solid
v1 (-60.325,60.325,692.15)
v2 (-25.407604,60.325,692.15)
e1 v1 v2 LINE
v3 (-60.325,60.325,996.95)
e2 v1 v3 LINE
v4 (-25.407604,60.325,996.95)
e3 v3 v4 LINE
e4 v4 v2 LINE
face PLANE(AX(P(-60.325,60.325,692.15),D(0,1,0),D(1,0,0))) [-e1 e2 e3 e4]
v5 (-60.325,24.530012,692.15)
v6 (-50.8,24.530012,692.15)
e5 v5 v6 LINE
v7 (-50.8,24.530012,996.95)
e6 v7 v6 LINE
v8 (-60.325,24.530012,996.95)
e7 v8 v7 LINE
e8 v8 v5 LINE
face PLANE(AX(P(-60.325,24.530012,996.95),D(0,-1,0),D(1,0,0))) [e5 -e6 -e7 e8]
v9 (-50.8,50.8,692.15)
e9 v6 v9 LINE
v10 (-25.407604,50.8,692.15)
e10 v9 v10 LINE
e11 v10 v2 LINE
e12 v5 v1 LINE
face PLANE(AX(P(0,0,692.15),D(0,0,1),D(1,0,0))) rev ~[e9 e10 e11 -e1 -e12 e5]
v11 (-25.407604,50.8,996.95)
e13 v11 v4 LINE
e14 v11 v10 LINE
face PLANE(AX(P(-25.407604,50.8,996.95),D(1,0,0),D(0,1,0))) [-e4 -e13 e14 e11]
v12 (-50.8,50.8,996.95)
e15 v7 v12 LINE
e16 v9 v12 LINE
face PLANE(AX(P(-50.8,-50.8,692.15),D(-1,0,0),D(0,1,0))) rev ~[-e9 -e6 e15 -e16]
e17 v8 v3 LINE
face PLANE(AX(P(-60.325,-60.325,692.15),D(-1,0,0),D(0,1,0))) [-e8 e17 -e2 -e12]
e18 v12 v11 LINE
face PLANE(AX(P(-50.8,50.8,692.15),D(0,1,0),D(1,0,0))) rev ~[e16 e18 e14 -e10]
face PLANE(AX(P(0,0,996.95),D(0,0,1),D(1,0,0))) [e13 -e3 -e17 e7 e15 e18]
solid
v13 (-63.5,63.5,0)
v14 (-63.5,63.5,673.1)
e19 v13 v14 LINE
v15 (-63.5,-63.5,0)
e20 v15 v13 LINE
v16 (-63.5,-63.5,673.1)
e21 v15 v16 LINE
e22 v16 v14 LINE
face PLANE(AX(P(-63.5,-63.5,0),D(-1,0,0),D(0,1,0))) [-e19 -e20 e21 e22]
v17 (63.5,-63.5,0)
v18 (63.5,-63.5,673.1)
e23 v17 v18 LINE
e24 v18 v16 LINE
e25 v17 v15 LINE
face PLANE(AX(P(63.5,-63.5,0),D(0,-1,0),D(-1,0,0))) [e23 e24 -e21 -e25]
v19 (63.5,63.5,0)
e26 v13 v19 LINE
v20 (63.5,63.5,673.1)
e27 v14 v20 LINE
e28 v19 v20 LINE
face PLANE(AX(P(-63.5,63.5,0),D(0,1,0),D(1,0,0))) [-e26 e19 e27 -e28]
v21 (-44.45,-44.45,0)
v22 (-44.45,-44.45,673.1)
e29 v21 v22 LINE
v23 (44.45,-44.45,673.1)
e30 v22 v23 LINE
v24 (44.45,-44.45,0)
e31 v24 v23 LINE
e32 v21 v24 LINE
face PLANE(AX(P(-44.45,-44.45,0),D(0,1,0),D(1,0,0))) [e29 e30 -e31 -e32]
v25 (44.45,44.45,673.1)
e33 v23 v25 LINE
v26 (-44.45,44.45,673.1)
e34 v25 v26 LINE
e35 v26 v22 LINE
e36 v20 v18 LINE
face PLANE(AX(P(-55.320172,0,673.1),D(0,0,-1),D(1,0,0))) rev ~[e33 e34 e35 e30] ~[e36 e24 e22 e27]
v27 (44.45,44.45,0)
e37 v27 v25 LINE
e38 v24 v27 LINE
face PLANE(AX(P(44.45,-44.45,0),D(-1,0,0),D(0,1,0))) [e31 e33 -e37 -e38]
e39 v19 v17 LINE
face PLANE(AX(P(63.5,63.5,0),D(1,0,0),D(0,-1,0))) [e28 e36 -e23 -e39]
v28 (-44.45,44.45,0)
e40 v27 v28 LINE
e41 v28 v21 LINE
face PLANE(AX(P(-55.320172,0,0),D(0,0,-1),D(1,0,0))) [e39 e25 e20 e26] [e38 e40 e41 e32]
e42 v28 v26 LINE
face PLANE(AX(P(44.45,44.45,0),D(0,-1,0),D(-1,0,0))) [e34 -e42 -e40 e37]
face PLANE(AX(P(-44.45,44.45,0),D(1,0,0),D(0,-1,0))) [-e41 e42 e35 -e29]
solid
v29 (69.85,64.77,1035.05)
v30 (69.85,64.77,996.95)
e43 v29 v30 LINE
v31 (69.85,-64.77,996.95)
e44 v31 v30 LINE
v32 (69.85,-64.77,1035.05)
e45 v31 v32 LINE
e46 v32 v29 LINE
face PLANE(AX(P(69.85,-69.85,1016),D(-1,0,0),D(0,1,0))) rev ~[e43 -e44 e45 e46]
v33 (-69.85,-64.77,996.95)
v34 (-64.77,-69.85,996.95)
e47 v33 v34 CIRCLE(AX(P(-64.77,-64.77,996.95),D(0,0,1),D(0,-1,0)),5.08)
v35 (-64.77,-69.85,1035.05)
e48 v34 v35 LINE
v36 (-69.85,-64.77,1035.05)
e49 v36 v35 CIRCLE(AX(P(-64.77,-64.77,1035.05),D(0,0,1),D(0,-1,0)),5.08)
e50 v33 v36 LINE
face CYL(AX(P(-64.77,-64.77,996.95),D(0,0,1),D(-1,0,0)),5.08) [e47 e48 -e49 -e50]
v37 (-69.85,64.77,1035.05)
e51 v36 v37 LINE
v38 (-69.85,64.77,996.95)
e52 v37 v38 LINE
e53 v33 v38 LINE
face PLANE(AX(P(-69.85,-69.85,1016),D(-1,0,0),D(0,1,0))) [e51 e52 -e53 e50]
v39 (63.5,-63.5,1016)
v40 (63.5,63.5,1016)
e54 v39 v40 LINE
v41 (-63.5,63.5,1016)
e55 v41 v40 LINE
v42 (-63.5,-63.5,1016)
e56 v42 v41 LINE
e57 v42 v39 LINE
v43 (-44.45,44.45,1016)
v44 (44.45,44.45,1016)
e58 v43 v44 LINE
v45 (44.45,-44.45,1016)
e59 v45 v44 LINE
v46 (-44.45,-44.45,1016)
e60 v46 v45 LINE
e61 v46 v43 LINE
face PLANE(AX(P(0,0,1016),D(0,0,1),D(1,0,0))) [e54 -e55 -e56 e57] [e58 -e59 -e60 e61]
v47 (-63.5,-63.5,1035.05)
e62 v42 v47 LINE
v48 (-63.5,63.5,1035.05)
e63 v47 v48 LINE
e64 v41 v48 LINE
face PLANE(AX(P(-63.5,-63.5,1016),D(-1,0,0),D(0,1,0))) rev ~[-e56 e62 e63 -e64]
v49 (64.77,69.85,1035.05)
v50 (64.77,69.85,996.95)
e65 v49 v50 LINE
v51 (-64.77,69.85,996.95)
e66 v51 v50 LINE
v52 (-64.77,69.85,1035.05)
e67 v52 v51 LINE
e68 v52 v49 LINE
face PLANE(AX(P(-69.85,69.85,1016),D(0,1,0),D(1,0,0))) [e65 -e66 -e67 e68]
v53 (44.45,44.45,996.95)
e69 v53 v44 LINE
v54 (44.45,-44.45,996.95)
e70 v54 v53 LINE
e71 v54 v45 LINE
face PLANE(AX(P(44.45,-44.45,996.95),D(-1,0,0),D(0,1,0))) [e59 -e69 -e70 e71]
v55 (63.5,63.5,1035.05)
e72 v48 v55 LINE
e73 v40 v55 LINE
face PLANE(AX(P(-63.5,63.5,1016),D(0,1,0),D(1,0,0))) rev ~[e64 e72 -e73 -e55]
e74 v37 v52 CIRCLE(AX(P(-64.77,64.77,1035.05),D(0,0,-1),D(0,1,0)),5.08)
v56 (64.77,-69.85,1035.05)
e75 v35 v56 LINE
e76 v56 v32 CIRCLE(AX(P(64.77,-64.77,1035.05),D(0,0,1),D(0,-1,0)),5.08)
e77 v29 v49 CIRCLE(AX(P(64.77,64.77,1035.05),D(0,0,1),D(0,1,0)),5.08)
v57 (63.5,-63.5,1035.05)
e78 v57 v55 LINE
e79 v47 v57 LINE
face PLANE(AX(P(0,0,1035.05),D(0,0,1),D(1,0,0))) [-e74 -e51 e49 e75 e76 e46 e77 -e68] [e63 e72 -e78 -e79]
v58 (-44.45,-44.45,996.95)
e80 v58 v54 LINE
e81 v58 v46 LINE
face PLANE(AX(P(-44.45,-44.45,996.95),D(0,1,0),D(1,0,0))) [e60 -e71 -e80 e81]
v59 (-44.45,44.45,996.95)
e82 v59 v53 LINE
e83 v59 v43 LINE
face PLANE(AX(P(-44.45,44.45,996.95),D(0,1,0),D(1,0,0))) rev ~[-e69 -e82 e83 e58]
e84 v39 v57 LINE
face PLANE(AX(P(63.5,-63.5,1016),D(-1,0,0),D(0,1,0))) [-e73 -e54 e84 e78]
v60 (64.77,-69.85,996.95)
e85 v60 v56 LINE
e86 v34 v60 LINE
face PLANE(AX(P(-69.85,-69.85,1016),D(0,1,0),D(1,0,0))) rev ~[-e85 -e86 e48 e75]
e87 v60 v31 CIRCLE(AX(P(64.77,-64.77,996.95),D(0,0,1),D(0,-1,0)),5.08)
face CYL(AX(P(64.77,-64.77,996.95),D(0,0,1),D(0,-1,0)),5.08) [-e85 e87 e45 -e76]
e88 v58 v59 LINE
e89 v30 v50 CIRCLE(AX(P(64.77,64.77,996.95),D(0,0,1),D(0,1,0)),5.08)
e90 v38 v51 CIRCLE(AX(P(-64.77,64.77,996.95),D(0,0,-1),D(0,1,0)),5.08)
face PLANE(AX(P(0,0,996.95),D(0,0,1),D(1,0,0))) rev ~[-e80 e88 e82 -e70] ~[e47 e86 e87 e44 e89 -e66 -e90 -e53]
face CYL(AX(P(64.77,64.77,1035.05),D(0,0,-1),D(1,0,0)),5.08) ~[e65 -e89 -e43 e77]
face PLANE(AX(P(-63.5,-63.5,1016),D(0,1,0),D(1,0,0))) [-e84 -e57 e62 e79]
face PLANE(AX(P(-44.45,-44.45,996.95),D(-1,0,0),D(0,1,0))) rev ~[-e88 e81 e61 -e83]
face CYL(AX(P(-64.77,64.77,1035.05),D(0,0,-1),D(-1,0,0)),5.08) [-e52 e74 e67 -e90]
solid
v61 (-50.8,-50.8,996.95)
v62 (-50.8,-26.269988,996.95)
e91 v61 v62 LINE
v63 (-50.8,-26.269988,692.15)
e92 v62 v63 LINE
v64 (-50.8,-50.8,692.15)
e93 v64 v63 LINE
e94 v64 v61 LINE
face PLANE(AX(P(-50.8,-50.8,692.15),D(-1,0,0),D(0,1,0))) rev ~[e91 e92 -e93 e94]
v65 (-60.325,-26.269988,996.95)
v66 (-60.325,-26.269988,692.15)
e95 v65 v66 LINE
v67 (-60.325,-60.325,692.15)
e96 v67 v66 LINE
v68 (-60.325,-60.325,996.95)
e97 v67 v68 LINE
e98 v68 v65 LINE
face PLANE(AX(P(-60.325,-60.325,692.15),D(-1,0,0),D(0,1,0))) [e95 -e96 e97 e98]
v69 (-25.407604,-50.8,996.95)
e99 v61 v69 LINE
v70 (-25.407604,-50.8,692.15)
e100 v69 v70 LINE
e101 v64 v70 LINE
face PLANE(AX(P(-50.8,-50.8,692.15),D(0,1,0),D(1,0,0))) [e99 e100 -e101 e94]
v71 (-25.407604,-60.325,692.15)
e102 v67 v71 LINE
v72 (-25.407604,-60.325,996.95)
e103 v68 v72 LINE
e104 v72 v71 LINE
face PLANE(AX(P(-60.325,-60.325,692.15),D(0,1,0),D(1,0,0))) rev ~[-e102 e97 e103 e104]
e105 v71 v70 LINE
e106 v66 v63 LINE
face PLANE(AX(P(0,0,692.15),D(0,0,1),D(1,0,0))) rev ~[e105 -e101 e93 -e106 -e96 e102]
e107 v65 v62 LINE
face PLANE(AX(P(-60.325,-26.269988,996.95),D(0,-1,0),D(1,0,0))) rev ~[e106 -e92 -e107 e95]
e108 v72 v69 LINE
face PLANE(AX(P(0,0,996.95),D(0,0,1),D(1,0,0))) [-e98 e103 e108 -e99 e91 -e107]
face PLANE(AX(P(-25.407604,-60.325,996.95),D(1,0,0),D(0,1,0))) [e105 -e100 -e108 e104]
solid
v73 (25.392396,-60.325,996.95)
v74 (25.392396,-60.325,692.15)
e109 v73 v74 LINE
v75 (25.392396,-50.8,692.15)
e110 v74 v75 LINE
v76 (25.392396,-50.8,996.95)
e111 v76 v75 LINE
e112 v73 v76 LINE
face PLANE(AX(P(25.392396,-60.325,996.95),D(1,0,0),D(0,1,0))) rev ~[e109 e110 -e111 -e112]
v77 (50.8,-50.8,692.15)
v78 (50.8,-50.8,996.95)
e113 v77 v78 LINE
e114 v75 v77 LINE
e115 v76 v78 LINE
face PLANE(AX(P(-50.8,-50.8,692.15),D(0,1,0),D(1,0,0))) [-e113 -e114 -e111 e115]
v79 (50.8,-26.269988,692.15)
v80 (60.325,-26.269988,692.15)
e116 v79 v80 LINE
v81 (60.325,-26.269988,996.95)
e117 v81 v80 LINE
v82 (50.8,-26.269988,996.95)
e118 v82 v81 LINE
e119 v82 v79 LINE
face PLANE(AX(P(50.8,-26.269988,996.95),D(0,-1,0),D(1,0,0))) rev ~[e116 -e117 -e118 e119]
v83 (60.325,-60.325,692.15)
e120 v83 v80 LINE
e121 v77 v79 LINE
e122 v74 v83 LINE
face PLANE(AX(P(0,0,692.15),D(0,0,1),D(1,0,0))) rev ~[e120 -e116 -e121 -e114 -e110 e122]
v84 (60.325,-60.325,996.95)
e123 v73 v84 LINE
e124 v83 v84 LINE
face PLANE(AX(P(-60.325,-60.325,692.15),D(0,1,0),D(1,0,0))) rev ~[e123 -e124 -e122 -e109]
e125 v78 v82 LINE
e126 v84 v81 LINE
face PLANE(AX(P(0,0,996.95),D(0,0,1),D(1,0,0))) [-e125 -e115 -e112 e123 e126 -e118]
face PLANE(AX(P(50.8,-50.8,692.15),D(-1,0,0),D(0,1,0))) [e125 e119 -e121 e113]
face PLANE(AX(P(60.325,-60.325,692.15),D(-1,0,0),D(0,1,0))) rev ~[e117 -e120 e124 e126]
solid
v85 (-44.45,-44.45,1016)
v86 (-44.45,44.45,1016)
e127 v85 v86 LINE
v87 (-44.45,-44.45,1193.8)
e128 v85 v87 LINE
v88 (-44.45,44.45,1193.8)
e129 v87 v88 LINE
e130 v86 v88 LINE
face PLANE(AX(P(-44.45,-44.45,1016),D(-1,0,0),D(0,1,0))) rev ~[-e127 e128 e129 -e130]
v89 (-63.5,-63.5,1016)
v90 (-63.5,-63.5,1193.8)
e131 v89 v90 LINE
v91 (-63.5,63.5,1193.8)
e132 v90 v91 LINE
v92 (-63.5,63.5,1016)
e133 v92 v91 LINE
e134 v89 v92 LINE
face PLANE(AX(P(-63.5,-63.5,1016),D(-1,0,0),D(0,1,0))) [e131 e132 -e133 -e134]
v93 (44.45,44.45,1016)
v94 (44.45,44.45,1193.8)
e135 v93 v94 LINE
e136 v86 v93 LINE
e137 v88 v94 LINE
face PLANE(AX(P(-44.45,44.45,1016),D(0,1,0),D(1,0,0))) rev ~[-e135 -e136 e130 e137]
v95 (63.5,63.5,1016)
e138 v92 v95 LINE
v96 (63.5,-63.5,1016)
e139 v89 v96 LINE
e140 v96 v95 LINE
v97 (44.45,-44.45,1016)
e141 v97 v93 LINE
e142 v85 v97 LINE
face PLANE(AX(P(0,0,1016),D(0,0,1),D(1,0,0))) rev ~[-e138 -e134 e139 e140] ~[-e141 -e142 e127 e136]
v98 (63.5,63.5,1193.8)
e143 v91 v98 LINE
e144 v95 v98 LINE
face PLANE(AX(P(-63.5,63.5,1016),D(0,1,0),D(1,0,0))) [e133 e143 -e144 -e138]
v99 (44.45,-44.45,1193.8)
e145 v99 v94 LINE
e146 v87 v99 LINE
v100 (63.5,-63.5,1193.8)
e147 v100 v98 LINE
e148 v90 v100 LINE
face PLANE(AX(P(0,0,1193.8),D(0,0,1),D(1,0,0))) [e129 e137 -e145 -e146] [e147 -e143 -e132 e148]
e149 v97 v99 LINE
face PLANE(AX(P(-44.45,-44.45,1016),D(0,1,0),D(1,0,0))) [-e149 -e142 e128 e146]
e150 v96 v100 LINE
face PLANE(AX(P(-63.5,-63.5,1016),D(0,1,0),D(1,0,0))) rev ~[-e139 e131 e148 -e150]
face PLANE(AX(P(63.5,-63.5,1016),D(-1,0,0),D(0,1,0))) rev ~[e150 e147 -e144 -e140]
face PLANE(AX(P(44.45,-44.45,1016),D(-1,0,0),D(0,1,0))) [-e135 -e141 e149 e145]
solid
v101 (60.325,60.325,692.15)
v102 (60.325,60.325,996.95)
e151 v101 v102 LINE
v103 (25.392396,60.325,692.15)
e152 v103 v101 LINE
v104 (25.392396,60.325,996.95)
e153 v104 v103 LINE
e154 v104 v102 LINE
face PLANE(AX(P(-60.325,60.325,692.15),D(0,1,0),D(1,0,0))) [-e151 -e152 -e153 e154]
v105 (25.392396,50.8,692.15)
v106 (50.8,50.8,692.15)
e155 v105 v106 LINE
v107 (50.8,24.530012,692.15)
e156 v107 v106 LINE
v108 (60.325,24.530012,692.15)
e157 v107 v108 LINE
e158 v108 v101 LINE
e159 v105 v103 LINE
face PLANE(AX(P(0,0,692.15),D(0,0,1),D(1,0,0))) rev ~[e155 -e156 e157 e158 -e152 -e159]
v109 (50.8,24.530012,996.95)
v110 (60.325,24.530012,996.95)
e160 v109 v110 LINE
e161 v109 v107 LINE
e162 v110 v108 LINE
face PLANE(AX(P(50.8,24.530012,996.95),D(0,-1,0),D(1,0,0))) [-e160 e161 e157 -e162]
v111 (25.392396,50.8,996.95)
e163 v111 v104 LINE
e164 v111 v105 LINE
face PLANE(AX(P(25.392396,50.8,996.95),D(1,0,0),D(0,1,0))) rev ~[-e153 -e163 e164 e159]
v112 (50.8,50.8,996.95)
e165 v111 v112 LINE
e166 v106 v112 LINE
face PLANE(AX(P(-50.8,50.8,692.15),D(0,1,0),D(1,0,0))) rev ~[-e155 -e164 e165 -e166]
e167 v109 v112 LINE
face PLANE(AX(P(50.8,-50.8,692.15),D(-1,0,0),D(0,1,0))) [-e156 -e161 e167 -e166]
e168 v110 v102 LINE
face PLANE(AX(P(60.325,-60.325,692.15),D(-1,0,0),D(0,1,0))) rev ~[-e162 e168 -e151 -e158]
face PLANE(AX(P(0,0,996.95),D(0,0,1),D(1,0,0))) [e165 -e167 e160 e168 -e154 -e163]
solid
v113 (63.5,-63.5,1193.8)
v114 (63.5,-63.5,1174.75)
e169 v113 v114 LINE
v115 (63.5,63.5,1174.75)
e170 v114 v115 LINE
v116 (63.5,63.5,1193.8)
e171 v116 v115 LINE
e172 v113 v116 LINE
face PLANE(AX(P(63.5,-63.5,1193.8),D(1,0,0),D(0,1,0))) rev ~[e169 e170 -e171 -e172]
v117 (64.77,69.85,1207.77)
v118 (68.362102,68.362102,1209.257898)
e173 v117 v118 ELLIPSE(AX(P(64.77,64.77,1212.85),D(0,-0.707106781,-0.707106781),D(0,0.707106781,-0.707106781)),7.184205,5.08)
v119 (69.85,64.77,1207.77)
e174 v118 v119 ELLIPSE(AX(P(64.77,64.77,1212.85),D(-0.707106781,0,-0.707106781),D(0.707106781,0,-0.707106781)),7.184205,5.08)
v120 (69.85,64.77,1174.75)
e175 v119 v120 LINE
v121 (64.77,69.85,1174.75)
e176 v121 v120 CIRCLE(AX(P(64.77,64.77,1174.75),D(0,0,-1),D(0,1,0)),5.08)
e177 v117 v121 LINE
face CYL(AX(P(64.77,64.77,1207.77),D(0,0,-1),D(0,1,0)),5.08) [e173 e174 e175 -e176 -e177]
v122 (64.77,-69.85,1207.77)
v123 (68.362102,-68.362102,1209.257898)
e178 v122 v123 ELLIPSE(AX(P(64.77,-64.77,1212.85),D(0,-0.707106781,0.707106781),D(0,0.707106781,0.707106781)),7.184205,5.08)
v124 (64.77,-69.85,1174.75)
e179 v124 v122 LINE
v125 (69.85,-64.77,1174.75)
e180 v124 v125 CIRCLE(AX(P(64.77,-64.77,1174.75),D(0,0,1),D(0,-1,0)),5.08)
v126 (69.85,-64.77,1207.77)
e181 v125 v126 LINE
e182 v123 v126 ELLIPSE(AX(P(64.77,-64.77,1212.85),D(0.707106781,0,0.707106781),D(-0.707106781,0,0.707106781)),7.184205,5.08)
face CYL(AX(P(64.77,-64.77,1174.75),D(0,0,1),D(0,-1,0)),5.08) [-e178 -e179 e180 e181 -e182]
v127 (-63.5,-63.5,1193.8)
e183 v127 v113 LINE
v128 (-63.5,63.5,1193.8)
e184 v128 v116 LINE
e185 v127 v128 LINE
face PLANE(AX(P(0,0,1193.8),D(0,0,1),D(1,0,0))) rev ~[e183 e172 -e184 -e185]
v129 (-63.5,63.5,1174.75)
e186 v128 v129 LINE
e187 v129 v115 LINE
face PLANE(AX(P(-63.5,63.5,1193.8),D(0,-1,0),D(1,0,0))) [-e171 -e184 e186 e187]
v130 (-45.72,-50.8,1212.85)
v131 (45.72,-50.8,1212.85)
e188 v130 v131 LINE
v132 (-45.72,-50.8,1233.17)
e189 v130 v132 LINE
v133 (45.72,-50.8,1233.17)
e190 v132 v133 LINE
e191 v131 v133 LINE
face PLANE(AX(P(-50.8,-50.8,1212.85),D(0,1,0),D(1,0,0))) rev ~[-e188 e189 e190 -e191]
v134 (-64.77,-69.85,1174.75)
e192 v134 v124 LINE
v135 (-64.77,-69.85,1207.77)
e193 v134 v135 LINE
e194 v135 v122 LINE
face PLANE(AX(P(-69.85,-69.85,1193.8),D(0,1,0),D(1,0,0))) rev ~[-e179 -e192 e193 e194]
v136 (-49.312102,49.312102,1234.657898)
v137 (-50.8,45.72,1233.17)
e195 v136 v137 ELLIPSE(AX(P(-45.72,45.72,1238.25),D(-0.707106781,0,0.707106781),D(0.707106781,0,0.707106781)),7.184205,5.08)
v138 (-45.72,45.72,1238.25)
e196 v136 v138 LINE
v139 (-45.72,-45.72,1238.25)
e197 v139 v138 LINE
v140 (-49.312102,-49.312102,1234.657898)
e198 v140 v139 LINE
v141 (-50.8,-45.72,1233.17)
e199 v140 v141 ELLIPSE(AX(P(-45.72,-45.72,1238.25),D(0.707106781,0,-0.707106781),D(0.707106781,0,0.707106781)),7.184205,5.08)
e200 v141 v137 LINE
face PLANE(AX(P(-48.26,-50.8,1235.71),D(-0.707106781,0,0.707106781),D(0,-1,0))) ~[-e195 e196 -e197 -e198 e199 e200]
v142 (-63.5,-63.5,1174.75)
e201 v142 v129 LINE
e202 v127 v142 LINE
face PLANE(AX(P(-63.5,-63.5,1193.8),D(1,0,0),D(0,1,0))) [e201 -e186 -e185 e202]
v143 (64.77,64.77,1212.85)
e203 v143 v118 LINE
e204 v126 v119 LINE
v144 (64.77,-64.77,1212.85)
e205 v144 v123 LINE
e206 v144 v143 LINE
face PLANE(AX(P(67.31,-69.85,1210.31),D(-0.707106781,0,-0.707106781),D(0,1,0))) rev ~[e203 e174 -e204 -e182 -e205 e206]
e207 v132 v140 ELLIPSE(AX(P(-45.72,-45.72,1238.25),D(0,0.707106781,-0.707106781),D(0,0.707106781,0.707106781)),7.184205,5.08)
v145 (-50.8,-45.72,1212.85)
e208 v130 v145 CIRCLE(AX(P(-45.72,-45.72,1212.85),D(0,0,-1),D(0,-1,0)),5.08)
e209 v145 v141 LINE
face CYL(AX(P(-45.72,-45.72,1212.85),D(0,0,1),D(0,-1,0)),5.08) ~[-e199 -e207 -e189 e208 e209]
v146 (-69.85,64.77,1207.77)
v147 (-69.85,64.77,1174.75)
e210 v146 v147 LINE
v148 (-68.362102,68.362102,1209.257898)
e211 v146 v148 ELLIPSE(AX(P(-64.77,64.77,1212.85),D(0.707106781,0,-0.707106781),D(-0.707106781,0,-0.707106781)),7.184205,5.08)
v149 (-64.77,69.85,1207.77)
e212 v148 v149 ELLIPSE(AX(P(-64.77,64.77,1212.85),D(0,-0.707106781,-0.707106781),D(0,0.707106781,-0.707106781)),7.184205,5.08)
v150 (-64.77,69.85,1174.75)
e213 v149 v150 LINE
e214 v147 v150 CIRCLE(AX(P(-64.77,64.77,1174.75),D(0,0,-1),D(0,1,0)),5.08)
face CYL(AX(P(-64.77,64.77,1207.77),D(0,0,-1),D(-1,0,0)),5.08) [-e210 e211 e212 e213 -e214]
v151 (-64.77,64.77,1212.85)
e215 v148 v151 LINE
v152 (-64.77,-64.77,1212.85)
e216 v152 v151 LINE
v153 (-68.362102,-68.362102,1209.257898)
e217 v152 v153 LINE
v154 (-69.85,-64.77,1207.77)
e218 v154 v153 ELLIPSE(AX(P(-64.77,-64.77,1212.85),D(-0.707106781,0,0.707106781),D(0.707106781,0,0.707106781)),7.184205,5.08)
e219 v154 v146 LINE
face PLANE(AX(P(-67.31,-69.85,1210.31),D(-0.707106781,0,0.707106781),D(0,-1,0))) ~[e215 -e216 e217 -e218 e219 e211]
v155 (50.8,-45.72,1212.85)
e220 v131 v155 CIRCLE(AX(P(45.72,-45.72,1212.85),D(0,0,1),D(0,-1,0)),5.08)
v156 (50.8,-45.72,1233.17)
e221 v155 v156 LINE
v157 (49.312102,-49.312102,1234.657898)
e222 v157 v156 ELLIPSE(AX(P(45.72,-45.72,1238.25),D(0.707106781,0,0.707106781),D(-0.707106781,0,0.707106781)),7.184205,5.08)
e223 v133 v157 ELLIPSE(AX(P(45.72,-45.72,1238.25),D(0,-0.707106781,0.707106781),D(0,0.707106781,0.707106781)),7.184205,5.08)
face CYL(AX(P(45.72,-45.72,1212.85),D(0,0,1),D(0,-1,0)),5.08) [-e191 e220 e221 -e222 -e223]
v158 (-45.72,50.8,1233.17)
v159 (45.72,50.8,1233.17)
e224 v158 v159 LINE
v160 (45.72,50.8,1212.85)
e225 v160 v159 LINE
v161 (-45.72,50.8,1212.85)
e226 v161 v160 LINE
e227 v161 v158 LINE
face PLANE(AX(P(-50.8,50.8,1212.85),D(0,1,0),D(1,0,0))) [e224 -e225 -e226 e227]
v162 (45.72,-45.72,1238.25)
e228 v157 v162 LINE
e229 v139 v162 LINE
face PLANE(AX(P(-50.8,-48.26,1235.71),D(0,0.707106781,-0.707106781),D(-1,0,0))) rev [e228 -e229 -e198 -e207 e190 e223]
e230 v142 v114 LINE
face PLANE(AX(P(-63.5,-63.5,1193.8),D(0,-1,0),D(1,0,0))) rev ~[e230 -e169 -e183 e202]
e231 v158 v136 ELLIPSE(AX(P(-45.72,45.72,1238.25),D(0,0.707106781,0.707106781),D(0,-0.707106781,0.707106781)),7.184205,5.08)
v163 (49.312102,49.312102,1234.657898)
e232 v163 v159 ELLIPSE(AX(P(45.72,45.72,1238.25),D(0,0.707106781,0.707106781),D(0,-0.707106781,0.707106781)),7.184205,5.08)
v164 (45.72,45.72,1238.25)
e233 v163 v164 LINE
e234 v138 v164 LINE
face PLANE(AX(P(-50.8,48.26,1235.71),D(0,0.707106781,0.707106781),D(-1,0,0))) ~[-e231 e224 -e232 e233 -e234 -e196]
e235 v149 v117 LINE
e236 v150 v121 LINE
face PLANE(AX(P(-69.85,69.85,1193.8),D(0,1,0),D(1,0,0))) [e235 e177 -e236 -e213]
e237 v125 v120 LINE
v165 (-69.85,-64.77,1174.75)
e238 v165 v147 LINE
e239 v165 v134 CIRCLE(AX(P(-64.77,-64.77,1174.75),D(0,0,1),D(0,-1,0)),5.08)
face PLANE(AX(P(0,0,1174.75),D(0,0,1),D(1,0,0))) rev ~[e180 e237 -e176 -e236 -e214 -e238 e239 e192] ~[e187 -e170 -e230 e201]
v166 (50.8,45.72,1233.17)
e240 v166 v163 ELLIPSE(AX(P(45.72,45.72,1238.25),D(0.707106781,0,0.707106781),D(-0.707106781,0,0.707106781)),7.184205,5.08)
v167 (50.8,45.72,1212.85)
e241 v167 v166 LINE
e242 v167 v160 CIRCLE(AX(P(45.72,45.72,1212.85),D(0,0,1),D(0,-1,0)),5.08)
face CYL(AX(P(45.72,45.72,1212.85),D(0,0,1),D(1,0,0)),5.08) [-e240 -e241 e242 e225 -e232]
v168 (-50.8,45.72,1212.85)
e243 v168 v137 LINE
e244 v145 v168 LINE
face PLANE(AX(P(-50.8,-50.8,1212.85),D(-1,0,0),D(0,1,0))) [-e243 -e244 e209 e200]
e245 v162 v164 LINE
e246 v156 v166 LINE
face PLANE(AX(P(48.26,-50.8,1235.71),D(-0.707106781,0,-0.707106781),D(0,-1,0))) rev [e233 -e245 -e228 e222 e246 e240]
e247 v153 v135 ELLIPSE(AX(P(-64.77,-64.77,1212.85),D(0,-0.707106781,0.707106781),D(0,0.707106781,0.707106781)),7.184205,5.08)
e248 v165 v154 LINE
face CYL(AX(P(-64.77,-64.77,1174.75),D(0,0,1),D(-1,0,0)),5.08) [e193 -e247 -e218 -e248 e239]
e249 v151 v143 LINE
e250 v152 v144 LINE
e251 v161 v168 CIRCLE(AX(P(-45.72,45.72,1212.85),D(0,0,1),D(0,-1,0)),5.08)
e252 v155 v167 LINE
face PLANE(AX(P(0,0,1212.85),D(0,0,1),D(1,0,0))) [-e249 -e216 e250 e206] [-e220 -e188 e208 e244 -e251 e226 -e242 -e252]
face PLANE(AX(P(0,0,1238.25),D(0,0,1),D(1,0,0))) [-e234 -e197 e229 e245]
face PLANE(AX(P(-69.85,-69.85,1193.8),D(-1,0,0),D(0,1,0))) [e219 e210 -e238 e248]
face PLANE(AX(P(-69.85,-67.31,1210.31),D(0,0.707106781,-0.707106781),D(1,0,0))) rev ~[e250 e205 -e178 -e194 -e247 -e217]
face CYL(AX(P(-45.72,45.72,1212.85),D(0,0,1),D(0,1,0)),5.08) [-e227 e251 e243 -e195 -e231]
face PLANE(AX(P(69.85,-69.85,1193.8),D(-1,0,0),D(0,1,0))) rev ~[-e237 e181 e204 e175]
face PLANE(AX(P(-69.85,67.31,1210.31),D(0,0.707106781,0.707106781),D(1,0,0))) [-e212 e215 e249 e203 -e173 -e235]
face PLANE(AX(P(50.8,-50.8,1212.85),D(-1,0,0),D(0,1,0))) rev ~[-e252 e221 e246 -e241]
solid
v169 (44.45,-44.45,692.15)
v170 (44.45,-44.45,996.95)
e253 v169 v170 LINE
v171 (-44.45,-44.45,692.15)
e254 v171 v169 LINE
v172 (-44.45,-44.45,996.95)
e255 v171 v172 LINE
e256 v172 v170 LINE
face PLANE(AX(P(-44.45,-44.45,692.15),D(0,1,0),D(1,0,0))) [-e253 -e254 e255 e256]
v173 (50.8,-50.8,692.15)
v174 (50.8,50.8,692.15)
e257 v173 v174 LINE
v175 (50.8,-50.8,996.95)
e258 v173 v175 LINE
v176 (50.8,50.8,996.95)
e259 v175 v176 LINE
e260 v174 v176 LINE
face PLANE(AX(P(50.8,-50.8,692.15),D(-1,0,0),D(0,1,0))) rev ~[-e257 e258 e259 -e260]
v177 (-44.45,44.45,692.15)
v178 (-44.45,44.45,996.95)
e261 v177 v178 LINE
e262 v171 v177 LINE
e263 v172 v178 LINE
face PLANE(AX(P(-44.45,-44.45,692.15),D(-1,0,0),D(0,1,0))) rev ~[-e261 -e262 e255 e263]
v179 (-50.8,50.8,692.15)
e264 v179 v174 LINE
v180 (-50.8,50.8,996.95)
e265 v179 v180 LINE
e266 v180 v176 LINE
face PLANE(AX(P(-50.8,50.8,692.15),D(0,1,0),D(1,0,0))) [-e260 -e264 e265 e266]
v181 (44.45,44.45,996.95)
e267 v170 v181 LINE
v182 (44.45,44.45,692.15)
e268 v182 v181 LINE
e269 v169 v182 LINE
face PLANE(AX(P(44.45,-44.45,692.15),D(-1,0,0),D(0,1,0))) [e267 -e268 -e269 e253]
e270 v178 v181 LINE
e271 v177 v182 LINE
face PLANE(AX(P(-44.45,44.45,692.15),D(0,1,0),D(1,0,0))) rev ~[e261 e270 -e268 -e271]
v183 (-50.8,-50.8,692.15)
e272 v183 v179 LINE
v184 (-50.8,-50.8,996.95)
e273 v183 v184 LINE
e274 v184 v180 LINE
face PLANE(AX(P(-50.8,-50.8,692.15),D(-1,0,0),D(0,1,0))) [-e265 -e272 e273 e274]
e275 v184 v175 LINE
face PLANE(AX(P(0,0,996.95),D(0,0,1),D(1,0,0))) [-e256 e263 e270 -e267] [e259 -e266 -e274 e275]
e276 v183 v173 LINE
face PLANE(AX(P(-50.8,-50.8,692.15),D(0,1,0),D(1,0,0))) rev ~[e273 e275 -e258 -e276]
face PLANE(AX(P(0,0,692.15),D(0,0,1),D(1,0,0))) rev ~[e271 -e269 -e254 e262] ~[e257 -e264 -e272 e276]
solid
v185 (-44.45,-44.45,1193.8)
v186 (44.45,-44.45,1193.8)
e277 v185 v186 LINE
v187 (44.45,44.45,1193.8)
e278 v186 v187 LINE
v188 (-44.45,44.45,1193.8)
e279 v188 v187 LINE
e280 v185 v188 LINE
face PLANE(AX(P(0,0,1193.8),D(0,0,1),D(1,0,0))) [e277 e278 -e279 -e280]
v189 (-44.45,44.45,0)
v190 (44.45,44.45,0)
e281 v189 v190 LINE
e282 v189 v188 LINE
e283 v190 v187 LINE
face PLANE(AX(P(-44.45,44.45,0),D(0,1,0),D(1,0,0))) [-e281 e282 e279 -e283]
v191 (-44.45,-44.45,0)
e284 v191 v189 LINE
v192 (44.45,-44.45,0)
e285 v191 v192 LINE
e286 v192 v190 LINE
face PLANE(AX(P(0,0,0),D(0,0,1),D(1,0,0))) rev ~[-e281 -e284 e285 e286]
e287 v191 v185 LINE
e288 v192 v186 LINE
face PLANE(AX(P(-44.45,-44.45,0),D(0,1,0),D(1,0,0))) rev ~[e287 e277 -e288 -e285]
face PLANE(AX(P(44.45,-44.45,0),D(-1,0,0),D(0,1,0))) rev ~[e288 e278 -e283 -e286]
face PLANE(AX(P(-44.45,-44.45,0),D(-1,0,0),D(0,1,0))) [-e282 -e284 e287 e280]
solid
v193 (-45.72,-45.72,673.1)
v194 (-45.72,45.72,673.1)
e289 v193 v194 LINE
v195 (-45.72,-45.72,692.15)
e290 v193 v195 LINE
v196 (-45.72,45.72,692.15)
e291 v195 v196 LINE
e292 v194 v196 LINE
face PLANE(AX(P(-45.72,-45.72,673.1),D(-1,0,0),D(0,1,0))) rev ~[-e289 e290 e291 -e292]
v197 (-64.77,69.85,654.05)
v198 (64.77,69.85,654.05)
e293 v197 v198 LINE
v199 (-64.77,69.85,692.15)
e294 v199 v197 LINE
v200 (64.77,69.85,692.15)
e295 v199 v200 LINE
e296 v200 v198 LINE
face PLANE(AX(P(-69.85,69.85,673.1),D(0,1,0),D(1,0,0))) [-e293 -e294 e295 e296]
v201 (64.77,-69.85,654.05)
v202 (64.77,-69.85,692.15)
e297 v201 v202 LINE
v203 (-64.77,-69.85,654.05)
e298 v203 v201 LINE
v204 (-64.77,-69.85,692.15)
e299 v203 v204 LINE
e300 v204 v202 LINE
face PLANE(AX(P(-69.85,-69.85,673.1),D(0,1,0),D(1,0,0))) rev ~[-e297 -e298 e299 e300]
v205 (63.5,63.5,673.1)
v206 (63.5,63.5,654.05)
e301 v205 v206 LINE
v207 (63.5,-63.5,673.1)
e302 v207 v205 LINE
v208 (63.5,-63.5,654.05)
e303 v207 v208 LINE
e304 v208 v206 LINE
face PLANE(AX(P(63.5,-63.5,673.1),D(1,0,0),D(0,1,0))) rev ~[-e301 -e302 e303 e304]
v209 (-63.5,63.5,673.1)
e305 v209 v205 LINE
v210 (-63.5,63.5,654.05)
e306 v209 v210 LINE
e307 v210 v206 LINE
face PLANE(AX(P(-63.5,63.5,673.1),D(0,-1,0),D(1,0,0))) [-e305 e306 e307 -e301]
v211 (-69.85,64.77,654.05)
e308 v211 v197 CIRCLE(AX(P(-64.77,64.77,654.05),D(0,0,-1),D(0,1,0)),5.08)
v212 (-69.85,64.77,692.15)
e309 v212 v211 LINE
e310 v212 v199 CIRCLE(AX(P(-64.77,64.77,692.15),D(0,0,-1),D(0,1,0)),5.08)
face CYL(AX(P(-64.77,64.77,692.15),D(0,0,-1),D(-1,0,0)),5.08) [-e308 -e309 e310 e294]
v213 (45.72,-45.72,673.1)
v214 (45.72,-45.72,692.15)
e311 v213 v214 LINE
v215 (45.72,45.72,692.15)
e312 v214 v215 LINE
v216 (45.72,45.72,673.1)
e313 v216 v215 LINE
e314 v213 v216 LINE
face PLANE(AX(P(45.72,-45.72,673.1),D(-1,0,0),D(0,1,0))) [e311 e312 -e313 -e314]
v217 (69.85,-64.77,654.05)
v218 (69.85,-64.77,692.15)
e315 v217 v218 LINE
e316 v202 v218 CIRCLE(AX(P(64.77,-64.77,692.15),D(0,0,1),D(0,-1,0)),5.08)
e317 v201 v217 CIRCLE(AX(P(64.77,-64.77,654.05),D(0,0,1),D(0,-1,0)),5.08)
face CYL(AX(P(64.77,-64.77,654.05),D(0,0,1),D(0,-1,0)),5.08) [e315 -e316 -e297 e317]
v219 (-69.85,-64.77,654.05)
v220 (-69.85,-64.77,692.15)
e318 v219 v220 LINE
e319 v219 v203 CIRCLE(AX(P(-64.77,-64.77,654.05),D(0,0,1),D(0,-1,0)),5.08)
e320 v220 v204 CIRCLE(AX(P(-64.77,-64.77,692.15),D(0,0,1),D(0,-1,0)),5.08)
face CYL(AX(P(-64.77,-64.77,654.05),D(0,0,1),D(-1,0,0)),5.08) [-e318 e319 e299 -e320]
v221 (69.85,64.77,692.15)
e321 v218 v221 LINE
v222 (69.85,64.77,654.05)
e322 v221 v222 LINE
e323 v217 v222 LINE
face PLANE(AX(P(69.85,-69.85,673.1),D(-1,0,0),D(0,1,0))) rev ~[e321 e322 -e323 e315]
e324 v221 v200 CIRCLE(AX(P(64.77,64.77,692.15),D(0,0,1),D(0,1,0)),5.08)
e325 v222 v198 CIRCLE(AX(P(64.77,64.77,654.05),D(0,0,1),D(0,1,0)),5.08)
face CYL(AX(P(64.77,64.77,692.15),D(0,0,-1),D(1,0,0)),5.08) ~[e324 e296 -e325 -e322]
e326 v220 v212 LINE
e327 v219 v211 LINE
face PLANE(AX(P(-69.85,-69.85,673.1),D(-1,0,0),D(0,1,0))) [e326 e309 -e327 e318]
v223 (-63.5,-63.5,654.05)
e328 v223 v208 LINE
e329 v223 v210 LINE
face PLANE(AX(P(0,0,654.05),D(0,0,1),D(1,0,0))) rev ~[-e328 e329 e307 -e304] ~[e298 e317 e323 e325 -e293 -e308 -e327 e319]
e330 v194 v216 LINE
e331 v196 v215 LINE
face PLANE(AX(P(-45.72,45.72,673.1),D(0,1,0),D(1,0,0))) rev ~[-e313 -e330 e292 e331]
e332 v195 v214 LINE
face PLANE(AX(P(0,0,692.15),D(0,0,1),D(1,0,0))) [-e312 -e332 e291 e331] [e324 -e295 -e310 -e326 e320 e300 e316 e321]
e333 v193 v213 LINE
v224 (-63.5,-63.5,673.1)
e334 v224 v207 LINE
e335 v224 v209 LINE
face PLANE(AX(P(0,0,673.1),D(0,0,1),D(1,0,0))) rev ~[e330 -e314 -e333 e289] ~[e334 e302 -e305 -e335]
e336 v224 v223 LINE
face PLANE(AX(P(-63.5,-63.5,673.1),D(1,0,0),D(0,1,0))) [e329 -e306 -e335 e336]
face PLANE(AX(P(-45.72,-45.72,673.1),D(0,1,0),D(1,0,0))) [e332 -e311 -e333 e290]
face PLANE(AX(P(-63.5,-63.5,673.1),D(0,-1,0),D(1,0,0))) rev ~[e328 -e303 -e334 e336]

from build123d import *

# Parameters (mm, degrees)
F0_W      = 88.9
F0_H      = 88.9
F1_DEPTH  = 1193.8
F3_DEPTH  = 673.1
F4_W      = 139.7
F4_H      = 139.7
F4_W_2    = 127
F4_H_2    = 127
F5_DEPTH  = 19.05
F6_W      = 139.7
F6_H      = 139.7
F6_W_2    = 91.44
F6_H_2    = 91.44
F7_DEPTH  = 19.05
F8_W      = 101.6
F8_H      = 101.6
F8_W_2    = 88.9
F8_H_2    = 88.9
F9_DEPTH  = 304.8
F10_W     = 139.7
F10_H     = 139.7
F10_W_2   = 88.9
F10_H_2   = 88.9
F11_DEPTH = 19.05
F12_W     = 139.7
F12_H     = 139.7
F12_W_2   = 127
F12_H_2   = 127
F13_DEPTH = 19.05
F14_W     = 127
F14_H     = 127
F14_W_2   = 88.9
F14_H_2   = 88.9
F15_DEPTH = 177.8
F16_W     = 120.65
F16_H     = 120.65
F16_W_2   = 101.6
F16_H_2   = 101.6
F17_DEPTH = 304.8
F18_W     = 9.525
F18_H     = 50.8
F18_W_2   = 50.8
F18_H_2   = 9.525
F19_DEPTH = 304.8
F20_W     = 139.7
F20_H     = 139.7
F20_W_2   = 127
F20_H_2   = 127
F21_DEPTH = 19.05
F22_W     = 139.7
F22_H     = 139.7
F23_DEPTH = 19.05
F24_W     = 101.6
F24_H     = 101.6
F25_DEPTH = 25.4
F26_SIZE  = 5.08
F27_R     = 5.08
F27_2_R   = 5.08
F27_3_R   = 5.08


with BuildPart() as f1:
    # F0 (on Top) → F1 (new body)
    with BuildSketch(Plane.XY):
        Rectangle(F0_W, F0_H)
    extrude(amount=F1_DEPTH)


with BuildPart() as f3:
    # F2 (on face) → F3 (new body)
    with BuildSketch(Plane(origin=(0, 0, 0), x_dir=(1, 0, 0), z_dir=(0, 0, -1))):
        Polygon((-44.45, 44.45), (-63.5, 63.5), (-63.5, -63.5), (-44.45, -44.45), align=None)
        Polygon((63.5, 63.5), (-63.5, 63.5), (-44.45, 44.45), (44.45, 44.45), align=None)
        Polygon((63.5, -63.5), (63.5, 63.5), (44.45, 44.45), (44.45, -44.45), align=None)
        Polygon((-44.45, -44.45), (-63.5, -63.5), (63.5, -63.5), (44.45, -44.45), align=None)
    extrude(amount=-F3_DEPTH)


with BuildPart() as f5:
    # F4 (on face) → F5 (new body)
    with BuildSketch(Plane.XY.offset(673.1)):
        Rectangle(F4_W, F4_H)
        Rectangle(F4_W_2, F4_H_2, mode=Mode.SUBTRACT)
    extrude(amount=-F5_DEPTH)

    # F6 (on face) → F7 (join)
    with BuildSketch(Plane.XY.offset(673.1)):
        Rectangle(F6_W, F6_H)
        Rectangle(F6_W_2, F6_H_2, mode=Mode.SUBTRACT)
    extrude(amount=F7_DEPTH)

    # F27
    f27_edges = [f5.edges().sort_by_distance(p)[0] for p in [
        (69.85, 69.85, 673.1),
        (69.85, -69.85, 673.1),
        (-69.85, -69.85, 673.1),
        (-69.85, 69.85, 673.1),
    ]]
    fillet(f27_edges, radius=F27_R)


with BuildPart() as f9:
    # F8 (on face) → F9 (new body)
    with BuildSketch(Plane.XY.offset(692.15)):
        Rectangle(F8_W, F8_H)
        Rectangle(F8_W_2, F8_H_2, mode=Mode.SUBTRACT)
    extrude(amount=F9_DEPTH)


with BuildPart() as f11:
    # F10 (on face) → F11 (new body)
    with BuildSketch(Plane.XY.offset(996.95)):
        Rectangle(F10_W, F10_H)
        Rectangle(F10_W_2, F10_H_2, mode=Mode.SUBTRACT)
    extrude(amount=F11_DEPTH)

    # F12 (on face) → F13 (join)
    with BuildSketch(Plane.XY.offset(1016)):
        Rectangle(F12_W, F12_H)
        Rectangle(F12_W_2, F12_H_2, mode=Mode.SUBTRACT)
    extrude(amount=F13_DEPTH)

    # F27#2
    f27_2_edges = [f11.edges().sort_by_distance(p)[0] for p in [
        (-69.85, -69.85, 1016),
        (69.85, -69.85, 1016),
        (-69.85, 69.85, 1016),
        (69.85, 69.85, 1016),
    ]]
    fillet(f27_2_edges, radius=F27_2_R)


with BuildPart() as f15:
    # F14 (on face) → F15 (new body)
    with BuildSketch(Plane.XY.offset(1016)):
        Rectangle(F14_W, F14_H)
        Rectangle(F14_W_2, F14_H_2, mode=Mode.SUBTRACT)
    extrude(amount=F15_DEPTH)


with BuildPart() as f17:
    # F16 (on face) → F17 (new body)
    with BuildSketch(Plane.XY.offset(692.15)):
        Rectangle(F16_W, F16_H)
        Rectangle(F16_W_2, F16_H_2, mode=Mode.SUBTRACT)
    extrude(amount=F17_DEPTH)

    # F18 (on face) → F19 (cut)
    with BuildSketch(Plane.XY.offset(996.95)):
        with Locations((-55.5625, -0.8699878395)):
            Rectangle(F18_W, F18_H)
        with Locations((55.5625, -0.8699878395)):
            Rectangle(F18_W, F18_H)
        with Locations((-0.0076036245, 55.5625)):
            Rectangle(F18_W_2, F18_H_2)
        with Locations((-0.0076036245, -55.5625)):
            Rectangle(F18_W_2, F18_H_2)
    extrude(amount=-F19_DEPTH, mode=Mode.SUBTRACT)


with BuildPart() as f21:
    # F20 (on face) → F21 (new body)
    with BuildSketch(Plane.XY.offset(1193.8)):
        Rectangle(F20_W, F20_H)
        Rectangle(F20_W_2, F20_H_2, mode=Mode.SUBTRACT)
    extrude(amount=-F21_DEPTH)

    # F22 (on face) → F23 (join)
    with BuildSketch(Plane.XY.offset(1193.8)):
        Rectangle(F22_W, F22_H)
    extrude(amount=F23_DEPTH)

    # F24 (on face) → F25 (join)
    with BuildSketch(Plane.XY.offset(1212.85)):
        Rectangle(F24_W, F24_H)
    extrude(amount=F25_DEPTH)

    # F26
    f26_edges = [f21.edges().sort_by_distance(p)[0] for p in [
        (0, 50.8, 1238.25),
        (-50.8, 0, 1238.25),
        (0, -50.8, 1238.25),
        (50.8, 0, 1238.25),
        (69.85, 0, 1212.85),
        (0, -69.85, 1212.85),
        (-69.85, 0, 1212.85),
        (0, 69.85, 1212.85),
    ]]
    chamfer(f26_edges, length=F26_SIZE)

    # F27#3
    f27_3_edges = [f21.edges().sort_by_distance(p)[0] for p in [
        (69.85, 69.85, 1191.26),
        (50.8, 50.8, 1223.01),
        (69.85, -69.85, 1191.26),
        (50.8, -50.8, 1223.01),
        (-69.85, -69.85, 1191.26),
        (-50.8, -50.8, 1223.01),
        (-69.85, 69.85, 1191.26),
        (-50.8, 50.8, 1223.01),
    ]]
    fillet(f27_3_edges, radius=F27_3_R)


solid = Compound([f1.part, f3.part, f5.part, f9.part, f11.part, f15.part, f17.part, f21.part])
